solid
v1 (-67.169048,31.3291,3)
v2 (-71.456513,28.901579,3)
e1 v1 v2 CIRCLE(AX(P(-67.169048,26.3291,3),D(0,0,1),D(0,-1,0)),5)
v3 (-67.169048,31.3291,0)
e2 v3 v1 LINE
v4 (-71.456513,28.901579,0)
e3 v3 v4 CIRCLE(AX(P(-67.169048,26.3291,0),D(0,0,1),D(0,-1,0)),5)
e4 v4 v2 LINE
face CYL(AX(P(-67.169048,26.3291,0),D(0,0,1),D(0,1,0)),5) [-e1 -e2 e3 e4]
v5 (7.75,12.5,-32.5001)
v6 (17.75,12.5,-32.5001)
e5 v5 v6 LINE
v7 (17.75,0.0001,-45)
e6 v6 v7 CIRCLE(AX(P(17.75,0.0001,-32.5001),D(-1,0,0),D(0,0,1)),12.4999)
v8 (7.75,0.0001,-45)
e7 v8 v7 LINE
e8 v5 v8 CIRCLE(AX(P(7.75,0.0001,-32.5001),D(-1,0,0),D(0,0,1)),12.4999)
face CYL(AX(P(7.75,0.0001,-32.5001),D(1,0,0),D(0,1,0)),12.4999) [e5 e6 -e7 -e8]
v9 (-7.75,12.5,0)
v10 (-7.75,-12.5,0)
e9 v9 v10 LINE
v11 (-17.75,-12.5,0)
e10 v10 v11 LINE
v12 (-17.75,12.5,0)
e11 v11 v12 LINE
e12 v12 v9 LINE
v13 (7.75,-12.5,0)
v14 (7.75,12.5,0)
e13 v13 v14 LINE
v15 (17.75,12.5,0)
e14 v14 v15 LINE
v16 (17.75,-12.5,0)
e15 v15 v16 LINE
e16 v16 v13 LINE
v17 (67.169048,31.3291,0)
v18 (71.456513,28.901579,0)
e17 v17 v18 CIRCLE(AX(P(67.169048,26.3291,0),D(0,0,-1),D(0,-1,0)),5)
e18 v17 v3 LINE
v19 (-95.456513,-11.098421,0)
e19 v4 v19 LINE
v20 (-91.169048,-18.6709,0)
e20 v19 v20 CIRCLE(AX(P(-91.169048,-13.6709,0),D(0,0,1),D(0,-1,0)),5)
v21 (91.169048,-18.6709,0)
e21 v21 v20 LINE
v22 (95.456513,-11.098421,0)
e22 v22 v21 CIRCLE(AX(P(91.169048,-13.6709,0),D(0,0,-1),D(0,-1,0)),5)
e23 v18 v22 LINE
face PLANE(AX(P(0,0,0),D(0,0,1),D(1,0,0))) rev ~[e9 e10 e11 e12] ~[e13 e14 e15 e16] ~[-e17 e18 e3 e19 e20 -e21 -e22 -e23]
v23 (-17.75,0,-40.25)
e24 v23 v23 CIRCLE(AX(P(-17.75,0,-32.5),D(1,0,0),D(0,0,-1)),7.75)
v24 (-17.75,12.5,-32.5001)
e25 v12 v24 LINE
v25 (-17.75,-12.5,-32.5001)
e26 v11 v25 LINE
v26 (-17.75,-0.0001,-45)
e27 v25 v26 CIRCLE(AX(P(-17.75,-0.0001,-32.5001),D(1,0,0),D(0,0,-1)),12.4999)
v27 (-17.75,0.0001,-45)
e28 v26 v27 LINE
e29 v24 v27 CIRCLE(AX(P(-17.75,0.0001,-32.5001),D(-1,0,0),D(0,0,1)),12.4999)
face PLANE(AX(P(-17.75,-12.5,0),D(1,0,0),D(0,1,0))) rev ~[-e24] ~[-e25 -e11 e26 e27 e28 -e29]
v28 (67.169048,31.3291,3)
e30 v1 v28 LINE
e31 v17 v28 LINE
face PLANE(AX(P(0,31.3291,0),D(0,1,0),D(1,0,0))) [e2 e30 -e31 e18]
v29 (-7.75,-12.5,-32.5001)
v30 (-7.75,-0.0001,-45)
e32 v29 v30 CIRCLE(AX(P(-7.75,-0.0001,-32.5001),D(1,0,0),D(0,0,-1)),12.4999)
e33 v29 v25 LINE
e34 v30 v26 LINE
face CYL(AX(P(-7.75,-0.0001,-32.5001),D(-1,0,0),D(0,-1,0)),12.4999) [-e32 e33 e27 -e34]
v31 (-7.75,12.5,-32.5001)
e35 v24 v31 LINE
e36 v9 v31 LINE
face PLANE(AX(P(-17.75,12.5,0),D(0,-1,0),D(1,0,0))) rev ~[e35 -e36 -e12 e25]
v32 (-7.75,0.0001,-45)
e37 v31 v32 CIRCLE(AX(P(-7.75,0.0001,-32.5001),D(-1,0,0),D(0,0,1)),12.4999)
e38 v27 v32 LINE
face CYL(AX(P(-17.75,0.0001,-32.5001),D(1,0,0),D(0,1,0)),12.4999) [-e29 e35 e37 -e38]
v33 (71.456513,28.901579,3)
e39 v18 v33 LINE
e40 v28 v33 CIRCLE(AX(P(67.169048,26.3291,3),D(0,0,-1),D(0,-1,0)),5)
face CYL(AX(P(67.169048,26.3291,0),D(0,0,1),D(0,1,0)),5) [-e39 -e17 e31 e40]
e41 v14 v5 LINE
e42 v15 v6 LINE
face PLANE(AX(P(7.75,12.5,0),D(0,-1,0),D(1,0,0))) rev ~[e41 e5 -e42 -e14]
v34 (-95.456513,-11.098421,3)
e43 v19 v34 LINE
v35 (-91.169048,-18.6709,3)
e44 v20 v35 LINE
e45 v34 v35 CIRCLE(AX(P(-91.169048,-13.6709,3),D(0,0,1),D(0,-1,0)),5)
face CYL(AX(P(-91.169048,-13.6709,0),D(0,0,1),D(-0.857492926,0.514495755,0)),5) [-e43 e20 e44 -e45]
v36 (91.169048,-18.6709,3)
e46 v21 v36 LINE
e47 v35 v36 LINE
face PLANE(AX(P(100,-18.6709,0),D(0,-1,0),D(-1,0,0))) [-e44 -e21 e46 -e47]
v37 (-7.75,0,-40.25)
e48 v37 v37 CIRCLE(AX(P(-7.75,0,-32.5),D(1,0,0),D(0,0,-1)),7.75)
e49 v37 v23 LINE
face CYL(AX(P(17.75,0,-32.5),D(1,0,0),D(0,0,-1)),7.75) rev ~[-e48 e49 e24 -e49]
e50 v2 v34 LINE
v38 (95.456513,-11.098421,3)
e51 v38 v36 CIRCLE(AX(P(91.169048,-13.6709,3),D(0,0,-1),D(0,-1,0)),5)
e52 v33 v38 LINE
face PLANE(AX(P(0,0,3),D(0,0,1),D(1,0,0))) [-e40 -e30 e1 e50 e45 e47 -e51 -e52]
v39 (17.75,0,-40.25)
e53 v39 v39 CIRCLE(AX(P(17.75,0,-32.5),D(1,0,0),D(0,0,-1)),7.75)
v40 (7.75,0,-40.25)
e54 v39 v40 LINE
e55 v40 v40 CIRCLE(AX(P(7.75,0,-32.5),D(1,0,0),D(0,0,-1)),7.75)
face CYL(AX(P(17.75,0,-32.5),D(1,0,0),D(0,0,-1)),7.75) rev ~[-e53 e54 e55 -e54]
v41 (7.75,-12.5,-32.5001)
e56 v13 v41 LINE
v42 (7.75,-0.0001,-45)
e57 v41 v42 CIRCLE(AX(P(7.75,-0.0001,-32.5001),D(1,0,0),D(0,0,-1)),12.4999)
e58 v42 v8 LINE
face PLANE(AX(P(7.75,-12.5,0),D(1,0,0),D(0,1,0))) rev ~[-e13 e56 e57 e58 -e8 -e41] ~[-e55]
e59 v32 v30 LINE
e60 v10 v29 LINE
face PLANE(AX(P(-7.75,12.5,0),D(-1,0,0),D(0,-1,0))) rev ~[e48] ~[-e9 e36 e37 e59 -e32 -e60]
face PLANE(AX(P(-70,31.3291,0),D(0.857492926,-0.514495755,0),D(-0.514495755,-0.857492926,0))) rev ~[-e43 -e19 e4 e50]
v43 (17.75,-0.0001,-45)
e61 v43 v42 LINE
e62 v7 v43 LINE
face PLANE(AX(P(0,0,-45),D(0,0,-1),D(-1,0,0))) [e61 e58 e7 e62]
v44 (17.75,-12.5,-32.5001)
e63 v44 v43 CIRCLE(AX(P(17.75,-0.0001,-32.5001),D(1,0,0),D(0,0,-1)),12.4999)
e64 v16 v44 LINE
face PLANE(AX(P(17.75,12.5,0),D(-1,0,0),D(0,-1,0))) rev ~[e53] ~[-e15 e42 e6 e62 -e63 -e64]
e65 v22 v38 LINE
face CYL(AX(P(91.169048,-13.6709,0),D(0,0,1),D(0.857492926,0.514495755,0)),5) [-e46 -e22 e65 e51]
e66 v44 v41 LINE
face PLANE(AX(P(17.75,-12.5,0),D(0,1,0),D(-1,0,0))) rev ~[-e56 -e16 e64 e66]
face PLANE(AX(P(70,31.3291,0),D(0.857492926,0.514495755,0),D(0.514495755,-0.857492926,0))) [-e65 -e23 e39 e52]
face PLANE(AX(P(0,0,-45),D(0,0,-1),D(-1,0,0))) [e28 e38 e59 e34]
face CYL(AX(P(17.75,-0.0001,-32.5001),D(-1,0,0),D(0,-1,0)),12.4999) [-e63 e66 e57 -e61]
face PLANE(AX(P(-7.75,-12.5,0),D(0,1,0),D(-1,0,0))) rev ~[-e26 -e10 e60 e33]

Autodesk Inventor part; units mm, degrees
ref_plane "YZ Plane" through (0, 0, 0) normal (1, 0, 0) x (0, 1, 0)
ref_plane "XZ Plane" through (0, 0, 0) normal (0, 1, 0) x (-1, 0, 0)
ref_plane "XY Plane" through (0, 0, 0) normal (0, 0, 1) x (1, 0, 0)
sketch "Sketch1" plane through (0, 0, 0) normal (0, 0, 1) x (1, 0, 0)
  line L0 (0, 31.3291) -> (70, 31.3291)
  line L1 (70, 31.3291) -> (100, -18.6709)
  line L2 (100, -18.6709) -> (0, -18.6709)
  line L3 (0, 31.3291) -> (0, -18.6709)
  line L4 (0, 31.3291) -> (-70, 31.3291)
  line L5 (-70, 31.3291) -> (-100, -18.6709)
  line L6 (-100, -18.6709) -> (0, -18.6709)
  point P0 (0, 0)
  dimension "d0" = 100
  dimension "d1" = 70
  dimension "d2" = 50
extrude "Extrusion1" add sketch "Sketch1" along normal blind 3
fillet "Fillet1" radius 5 4 edges at (70, 31.3291, 1.5) (100, -18.6709, 1.5) (-100, -18.6709, 1.5) (-70, 31.3291, 1.5)
sketch "Sketch2" plane through (0, 0, 0) normal (0, 0, -1) x (-1, 0, 0)
  line L0 (-17.75, -12.5) -> (17.75, -12.5)
  line L1 (17.75, -12.5) -> (17.75, 12.5)
  line L2 (17.75, 12.5) -> (-17.75, 12.5)
  line L3 (-17.75, 12.5) -> (-17.75, -12.5)
  line L4 (-17.75, -12.5) -> (17.75, 12.5) construction
  line L5 (17.75, -12.5) -> (-17.75, 12.5) construction
  line L6 (7.75, -12.5) -> (-7.75, -12.5)
  line L7 (-7.75, -12.5) -> (-7.75, 12.5)
  line L8 (-7.75, 12.5) -> (7.75, 12.5)
  line L9 (7.75, 12.5) -> (7.75, -12.5)
  line L10 (7.75, -12.5) -> (-7.75, 12.5) construction
  line L11 (-7.75, -12.5) -> (7.75, 12.5) construction
  point P0 (0, 0)
  dimension "d6" = 15.5
  dimension "d7" = 25
  dimension "d8" = 10
extrude "Extrusion2" add sketch "Sketch2" along normal blind 45 contours L3 L2 L7 L0 | L9 L2 L1 L0
fillet "Fillet2" radius 12.5 4 edges at (12.75, 12.5, -45) (12.75, -12.5, -45) (-12.75, -12.5, -45) (-12.75, 12.5, -45)
sketch "Sketch3" plane through (17.75, -12.5, 0) normal (1, 0, 0) x (0, 0, -1)
  arc A0 (32.5, 0) -> (32.5, 25) centre (32.5, 12.5) ccw projected
  line L0 (0, 25) -> (32.5, 25) projected
  line L1 (0, 0) -> (0, 25) projected
  line L2 (0, 0) -> (32.5, 0) projected
  circle A1 centre (32.5, 12.5) radius 7.75
  point P0 (0, 12.5)
  dimension "d12" = 15.5
extrude "Extrusion3" cut sketch "Sketch3" against normal up to surface (35.5 mm away) contours A1
properties part number "Lower Back Plate"
